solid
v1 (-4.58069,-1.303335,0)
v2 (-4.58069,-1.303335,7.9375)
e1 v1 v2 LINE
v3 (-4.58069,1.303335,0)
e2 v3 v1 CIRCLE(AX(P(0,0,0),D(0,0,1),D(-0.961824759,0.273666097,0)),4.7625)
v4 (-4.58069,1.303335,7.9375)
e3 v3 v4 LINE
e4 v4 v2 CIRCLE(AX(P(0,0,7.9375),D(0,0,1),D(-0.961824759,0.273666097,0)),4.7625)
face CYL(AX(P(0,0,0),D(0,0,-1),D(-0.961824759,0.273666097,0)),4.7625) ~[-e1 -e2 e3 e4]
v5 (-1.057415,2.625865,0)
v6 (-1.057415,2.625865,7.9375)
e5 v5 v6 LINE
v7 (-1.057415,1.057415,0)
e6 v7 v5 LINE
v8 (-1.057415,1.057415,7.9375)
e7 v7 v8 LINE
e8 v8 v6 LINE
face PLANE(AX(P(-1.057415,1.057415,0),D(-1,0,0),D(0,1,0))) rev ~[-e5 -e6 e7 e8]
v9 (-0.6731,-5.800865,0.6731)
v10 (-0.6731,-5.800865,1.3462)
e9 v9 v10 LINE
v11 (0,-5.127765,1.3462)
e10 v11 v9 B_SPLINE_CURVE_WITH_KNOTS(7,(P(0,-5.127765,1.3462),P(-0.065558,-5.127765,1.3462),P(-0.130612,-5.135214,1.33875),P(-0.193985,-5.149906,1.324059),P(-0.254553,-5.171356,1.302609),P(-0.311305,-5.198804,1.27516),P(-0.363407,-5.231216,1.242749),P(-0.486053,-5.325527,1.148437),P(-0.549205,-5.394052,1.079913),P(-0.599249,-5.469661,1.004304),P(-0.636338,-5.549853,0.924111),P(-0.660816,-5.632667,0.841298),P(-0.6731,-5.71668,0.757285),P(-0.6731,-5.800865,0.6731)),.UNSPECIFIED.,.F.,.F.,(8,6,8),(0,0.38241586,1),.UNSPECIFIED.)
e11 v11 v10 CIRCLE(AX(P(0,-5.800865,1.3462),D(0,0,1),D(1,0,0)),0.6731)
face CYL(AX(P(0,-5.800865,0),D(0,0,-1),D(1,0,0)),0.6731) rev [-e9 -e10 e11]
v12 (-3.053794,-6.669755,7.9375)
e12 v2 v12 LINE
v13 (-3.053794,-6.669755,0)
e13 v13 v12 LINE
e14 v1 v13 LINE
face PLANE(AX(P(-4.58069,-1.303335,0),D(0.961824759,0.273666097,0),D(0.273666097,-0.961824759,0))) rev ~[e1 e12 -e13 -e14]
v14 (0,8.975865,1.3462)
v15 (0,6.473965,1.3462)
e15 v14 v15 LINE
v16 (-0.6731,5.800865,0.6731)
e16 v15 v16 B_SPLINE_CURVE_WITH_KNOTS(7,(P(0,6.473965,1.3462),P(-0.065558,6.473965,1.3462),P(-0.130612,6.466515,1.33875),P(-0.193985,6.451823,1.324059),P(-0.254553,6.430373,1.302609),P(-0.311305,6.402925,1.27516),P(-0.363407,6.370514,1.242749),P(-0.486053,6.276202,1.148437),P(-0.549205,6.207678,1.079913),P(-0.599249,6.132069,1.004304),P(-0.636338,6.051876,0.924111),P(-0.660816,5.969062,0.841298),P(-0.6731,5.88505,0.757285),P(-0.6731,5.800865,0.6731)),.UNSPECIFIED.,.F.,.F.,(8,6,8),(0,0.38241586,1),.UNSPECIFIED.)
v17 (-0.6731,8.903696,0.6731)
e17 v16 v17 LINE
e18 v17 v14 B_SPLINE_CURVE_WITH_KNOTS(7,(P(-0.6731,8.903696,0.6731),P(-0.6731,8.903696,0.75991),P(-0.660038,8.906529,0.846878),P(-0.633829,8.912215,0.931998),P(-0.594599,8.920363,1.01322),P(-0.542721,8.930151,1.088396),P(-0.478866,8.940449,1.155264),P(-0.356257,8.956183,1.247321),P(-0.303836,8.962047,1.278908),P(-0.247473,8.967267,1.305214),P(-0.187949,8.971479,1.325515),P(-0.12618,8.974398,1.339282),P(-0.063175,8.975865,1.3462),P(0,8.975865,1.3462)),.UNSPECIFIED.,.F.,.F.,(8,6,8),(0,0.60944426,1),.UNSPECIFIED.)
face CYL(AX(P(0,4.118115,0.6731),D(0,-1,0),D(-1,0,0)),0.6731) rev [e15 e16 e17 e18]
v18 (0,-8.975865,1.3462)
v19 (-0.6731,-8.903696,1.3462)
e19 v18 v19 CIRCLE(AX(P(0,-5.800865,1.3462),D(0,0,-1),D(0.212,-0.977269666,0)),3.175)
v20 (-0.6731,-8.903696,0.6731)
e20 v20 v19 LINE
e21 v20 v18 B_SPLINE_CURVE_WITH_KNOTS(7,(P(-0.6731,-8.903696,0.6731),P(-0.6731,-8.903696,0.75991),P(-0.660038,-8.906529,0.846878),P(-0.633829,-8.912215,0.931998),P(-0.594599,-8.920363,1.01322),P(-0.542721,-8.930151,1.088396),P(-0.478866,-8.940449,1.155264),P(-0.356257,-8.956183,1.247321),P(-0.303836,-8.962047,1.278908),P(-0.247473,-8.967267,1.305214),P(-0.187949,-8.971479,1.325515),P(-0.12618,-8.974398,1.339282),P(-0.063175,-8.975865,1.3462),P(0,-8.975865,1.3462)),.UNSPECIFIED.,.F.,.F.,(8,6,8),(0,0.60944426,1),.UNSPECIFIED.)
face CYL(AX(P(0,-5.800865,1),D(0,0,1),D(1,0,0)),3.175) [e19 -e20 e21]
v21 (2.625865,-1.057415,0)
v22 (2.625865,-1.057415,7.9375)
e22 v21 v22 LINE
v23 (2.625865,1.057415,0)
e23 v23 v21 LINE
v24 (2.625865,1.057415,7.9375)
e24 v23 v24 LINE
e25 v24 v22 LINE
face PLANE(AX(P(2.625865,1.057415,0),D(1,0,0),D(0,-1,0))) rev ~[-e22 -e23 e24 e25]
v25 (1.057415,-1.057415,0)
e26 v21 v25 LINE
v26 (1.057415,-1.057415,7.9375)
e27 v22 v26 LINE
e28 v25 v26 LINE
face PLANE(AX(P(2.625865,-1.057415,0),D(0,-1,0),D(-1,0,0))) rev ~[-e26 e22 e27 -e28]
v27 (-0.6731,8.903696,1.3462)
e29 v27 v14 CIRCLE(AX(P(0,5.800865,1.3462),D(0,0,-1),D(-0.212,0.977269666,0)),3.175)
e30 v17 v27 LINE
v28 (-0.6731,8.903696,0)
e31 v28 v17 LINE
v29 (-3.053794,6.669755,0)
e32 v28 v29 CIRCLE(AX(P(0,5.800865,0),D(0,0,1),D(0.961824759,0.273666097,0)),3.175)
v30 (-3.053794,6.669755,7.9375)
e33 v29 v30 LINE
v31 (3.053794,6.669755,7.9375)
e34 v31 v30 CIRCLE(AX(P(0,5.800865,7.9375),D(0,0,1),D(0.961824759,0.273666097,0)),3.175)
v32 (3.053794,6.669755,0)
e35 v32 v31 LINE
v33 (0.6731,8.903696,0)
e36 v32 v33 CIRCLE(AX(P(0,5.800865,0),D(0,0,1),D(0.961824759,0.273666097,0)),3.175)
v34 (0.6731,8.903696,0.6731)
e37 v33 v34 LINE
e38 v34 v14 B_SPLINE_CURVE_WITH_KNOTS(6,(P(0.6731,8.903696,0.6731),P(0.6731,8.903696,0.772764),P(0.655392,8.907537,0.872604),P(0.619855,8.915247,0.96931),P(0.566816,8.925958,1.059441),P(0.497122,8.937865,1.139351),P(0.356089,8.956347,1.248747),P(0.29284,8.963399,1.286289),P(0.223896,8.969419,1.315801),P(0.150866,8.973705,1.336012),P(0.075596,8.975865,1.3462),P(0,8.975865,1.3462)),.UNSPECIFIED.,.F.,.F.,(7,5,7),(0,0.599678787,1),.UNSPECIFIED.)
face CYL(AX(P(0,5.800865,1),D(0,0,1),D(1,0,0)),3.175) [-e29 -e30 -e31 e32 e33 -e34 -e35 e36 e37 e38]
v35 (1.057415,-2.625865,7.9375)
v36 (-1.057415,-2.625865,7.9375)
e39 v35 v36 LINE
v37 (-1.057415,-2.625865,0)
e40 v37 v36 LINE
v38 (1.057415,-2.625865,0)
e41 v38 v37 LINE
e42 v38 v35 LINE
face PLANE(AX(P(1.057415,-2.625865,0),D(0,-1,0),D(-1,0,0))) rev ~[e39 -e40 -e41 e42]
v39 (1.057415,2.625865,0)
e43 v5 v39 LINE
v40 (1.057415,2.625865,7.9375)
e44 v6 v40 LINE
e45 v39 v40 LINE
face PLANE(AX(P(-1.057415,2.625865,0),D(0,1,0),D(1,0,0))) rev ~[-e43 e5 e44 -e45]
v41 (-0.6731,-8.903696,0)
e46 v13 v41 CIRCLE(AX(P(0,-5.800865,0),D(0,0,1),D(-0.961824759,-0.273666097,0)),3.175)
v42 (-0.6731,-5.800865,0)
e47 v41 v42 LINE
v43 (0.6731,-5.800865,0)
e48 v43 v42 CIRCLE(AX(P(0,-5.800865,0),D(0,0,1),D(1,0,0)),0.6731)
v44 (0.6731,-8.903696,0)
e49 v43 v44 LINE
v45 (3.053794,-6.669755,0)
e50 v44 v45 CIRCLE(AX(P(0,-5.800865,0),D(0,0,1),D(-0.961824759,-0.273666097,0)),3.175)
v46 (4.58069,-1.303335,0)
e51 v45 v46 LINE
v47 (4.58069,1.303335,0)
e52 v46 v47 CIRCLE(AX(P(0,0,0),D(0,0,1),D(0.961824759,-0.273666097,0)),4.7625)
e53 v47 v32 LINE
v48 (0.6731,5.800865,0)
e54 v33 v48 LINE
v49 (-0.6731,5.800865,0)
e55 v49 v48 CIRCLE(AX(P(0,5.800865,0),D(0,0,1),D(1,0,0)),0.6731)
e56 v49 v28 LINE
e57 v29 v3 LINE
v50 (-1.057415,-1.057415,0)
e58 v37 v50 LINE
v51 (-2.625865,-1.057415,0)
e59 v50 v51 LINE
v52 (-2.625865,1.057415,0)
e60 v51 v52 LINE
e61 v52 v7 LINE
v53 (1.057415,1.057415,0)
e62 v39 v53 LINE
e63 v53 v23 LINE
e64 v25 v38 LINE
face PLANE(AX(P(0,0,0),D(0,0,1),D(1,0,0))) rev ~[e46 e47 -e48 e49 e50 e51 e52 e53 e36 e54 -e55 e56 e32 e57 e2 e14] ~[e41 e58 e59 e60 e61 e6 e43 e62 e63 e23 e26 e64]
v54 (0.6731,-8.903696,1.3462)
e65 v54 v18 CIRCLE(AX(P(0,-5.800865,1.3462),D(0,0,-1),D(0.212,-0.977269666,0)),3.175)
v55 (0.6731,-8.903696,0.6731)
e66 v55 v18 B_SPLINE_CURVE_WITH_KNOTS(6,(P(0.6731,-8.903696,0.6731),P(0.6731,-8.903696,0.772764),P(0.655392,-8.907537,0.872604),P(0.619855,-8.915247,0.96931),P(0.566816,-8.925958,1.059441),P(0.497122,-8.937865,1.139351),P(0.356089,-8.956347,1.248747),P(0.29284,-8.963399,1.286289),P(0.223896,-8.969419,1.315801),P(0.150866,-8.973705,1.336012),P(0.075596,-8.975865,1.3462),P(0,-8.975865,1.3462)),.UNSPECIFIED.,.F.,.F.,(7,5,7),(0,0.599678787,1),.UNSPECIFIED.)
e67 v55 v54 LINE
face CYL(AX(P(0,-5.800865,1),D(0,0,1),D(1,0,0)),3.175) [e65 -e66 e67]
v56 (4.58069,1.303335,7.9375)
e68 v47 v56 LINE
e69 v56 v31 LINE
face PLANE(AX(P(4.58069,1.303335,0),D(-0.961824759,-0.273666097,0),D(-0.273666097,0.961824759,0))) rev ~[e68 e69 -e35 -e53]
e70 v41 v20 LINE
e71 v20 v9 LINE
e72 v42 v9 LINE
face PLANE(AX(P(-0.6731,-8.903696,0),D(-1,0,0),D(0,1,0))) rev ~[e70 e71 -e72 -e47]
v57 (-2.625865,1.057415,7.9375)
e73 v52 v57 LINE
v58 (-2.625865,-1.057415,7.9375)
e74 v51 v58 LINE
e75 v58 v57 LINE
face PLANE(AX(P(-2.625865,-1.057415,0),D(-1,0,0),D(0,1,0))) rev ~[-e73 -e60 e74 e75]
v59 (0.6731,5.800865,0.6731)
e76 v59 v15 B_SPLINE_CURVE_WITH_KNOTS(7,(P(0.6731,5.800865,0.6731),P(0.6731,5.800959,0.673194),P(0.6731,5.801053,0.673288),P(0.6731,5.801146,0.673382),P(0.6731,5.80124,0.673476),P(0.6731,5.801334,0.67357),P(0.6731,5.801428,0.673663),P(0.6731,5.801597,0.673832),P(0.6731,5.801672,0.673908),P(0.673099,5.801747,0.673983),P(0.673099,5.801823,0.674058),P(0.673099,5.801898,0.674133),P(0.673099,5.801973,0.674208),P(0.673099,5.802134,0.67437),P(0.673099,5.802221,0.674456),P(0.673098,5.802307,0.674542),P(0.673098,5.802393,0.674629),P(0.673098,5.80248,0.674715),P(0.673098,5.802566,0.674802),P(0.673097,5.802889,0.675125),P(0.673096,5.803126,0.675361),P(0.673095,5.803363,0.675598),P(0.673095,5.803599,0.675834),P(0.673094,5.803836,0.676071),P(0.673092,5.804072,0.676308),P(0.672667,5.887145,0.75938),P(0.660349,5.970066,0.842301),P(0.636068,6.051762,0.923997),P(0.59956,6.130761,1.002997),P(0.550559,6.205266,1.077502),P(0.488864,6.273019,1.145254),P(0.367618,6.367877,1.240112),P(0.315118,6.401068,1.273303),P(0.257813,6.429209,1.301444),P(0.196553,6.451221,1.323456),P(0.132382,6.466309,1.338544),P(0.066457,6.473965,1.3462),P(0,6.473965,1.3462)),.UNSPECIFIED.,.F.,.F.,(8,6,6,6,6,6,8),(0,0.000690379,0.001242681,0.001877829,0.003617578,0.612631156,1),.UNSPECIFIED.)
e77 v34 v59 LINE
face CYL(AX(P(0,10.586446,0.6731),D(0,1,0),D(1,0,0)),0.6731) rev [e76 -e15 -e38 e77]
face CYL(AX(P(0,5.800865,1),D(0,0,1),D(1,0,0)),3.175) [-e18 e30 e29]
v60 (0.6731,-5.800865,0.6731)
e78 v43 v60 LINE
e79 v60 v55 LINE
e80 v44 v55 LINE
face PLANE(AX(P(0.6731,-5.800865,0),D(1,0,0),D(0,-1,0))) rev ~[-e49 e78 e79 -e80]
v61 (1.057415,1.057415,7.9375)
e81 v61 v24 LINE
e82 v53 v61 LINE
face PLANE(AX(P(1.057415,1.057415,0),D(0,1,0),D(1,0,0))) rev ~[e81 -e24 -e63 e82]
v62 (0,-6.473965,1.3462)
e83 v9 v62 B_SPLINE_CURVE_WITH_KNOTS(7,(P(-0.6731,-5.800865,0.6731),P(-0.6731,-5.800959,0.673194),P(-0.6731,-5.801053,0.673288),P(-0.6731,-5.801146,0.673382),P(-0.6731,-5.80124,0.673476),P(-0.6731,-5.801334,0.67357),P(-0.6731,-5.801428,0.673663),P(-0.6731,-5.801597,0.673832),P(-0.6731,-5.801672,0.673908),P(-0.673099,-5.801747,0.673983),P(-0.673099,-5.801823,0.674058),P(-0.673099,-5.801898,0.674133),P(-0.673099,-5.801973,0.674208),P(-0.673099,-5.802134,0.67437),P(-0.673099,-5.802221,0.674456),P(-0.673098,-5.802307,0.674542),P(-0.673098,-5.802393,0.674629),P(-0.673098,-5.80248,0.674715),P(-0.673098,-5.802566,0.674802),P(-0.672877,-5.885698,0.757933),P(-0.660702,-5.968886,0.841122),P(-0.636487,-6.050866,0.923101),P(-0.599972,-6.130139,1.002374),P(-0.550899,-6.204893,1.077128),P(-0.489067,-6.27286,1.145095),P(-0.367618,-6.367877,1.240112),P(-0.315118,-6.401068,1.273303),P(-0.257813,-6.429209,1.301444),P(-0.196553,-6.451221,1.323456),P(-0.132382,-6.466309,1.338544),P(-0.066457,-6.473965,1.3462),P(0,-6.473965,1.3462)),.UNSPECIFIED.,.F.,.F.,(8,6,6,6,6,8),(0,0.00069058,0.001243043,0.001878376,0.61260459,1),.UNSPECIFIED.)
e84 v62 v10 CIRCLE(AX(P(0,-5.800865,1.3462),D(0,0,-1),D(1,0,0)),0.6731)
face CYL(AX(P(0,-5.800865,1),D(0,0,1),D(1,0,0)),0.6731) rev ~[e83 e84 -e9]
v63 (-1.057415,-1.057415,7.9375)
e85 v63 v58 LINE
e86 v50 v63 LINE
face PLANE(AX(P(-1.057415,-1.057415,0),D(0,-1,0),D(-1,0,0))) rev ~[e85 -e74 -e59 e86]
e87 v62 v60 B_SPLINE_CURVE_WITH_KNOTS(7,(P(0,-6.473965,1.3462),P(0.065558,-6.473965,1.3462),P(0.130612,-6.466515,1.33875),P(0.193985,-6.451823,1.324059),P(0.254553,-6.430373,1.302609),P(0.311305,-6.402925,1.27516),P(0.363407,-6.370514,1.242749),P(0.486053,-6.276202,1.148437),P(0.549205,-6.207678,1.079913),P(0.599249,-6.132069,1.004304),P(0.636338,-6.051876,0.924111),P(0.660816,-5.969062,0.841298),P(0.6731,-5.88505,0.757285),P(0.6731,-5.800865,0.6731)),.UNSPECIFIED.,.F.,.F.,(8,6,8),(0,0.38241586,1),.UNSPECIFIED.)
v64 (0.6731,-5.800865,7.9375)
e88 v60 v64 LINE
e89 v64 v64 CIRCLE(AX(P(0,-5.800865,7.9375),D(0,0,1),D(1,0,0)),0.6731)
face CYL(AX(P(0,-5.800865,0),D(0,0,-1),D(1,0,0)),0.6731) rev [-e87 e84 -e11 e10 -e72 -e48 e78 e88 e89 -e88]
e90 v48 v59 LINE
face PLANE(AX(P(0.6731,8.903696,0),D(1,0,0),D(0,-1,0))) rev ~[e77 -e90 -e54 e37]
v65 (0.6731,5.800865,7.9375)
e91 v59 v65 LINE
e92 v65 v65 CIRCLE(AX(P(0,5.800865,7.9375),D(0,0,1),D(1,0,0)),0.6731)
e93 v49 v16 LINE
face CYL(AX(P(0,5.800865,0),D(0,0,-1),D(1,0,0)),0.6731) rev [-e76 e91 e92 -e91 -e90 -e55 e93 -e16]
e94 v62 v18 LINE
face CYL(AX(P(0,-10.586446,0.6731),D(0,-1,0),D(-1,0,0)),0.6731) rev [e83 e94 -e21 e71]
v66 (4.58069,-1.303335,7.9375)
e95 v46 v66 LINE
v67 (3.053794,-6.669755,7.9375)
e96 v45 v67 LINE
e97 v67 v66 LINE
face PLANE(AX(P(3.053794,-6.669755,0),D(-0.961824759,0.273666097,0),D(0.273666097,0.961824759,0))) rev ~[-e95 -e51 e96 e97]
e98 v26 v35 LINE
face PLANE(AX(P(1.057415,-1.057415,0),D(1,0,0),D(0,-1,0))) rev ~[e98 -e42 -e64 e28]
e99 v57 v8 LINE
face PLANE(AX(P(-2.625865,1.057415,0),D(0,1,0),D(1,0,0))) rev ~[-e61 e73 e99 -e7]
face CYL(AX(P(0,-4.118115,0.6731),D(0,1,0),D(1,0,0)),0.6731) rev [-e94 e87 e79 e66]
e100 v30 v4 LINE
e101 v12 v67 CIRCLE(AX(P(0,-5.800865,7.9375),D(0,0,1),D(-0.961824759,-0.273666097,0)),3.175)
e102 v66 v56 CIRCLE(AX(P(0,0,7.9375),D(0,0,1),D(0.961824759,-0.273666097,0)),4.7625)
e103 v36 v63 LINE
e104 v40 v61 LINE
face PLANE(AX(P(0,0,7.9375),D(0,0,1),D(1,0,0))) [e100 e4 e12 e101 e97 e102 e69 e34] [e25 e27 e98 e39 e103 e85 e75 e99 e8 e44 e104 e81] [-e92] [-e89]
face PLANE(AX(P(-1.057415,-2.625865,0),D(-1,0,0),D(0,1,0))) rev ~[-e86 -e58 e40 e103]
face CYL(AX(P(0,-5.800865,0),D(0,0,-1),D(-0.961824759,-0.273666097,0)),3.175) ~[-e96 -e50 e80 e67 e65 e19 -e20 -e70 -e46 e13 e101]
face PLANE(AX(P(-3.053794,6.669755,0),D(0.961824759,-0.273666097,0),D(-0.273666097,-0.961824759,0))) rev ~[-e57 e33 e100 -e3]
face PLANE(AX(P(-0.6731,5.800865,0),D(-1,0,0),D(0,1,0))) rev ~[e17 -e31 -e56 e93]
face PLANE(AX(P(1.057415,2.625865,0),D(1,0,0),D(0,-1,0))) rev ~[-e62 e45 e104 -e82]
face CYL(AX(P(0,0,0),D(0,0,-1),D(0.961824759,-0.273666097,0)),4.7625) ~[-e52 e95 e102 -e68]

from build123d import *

# Parameters (mm, degrees)
F0_R         = 0.6731
F1_DEPTH     = 7.9375
F3_DEPTH     = 1.3462
F4_T4_DEPTH  = 6.4683311894
F4_S5_R      = 3.175
F4_T6_DEPTH  = 5
F4_S7_R      = 0.6731
F4_T8_DEPTH  = 5
F4_T12_DEPTH = 6.4683311894
F4_S13_R     = 3.175
F4_T14_DEPTH = 5
F4_S15_R     = 0.6731
F4_T16_DEPTH = 5
F4_T20_DEPTH = 6.4683311894
F4_S21_R     = 3.175
F4_T22_DEPTH = 5
F4_S23_R     = 0.6731
F4_T24_DEPTH = 5
F4_T28_DEPTH = 6.4683311894
F4_S29_R     = 3.175
F4_T30_DEPTH = 5
F4_S31_R     = 0.6731
F4_T32_DEPTH = 5


# Not quite as in the source:
# - a fillet or chamfer that OpenCascade refuses, or shapes differently, is made with other operations: its cross-section is extruded or revolved along the edge and cut away or added


with BuildPart() as f1:
    # F0 (on Top) → F1 (new body)
    with BuildSketch(Plane.XY):
        with BuildLine():
            ThreePointArc((-4.5806904159, 1.3033347856), (-4.7625, 0), (-4.5806904159, -1.3033347856))
            Line((-4.5806904159, -1.3033347856), (-3.0537936106, -6.6697545571))
            ThreePointArc((-3.0537936106, -6.6697545571), (0, -8.9758647), (3.0537936106, -6.6697545571))
            Line((3.0537936106, -6.6697545571), (4.5806904159, -1.3033347856))
            ThreePointArc((4.5806904159, -1.3033347856), (4.7625, 0), (4.5806904159, 1.3033347856))
            Line((4.5806904159, 1.3033347856), (3.0537936106, 6.6697545571))
            ThreePointArc((3.0537936106, 6.6697545571), (0, 8.9758647), (-3.0537936106, 6.6697545571))
            Line((-3.0537936106, 6.6697545571), (-4.5806904159, 1.3033347856))
        make_face()
        with Locations((0, -5.8008647)):
            Circle(F0_R, mode=Mode.SUBTRACT)
        Polygon((-1.0574147, 2.6258647), (1.0574147, 2.6258647), (1.0574147, 1.0574147), (2.6258647, 1.0574147), (2.6258647, -1.0574147), (1.0574147, -1.0574147), (1.0574147, -2.6258647), (-1.0574147, -2.6258647), (-1.0574147, -1.0574147), (-2.6258647, -1.0574147), (-2.6258647, 1.0574147), (-1.0574147, 1.0574147), align=None, mode=Mode.SUBTRACT)
        with Locations((0, 5.8008647)):
            Circle(F0_R, mode=Mode.SUBTRACT)
    extrude(amount=F1_DEPTH)

    # F2 (on face) → F3 (cut)
    with BuildSketch(Plane(origin=(0, 0, 0), x_dir=(1, 0, 0), z_dir=(0, 0, -1))):
        with BuildLine():
            Line((-0.6731, 5.8008647), (0.6731, 5.8008647))
            Line((0.6731, 5.8008647), (0.6731, 8.9036958894))
            ThreePointArc((0.6731, 8.9036958894), (0, 8.9758647), (-0.6731, 8.9036958894))
            Line((-0.6731, 8.9036958894), (-0.6731, 5.8008647))
        make_face()
        with BuildLine():
            Line((0.6731, -8.9036958894), (0.6731, -5.8008647))
            Line((0.6731, -5.8008647), (-0.6731, -5.8008647))
            Line((-0.6731, -5.8008647), (-0.6731, -8.9036958894))
            ThreePointArc((-0.6731, -8.9036958894), (0, -8.9758647), (0.6731, -8.9036958894))
        make_face()
    extrude(amount=-F3_DEPTH, mode=Mode.SUBTRACT)

    # F4: fillet of radius 0.6731 on 4 edges, made by hand


with BuildPart() as f4_tool2:
    # F4_s3 → F4_t4 (new body)
    with BuildSketch(Plane.XZ.offset(-10.5864458894)):
        with BuildLine():
            ThreePointArc((0.6731, 0.6731), (0.4759535744, 1.1490535744), (0, 1.3462))
            Line((0, 1.3462), (0.6731, 1.3462))
            Line((0.6731, 1.3462), (0.6731, 0.6731))
        make_face()
    extrude(amount=F4_T4_DEPTH)

    # F4_s5 → F4_t6 (intersect, symmetric)
    with BuildSketch(Plane.XY.offset(1)):
        with Locations((0, 5.8008647)):
            Circle(F4_S5_R)
    extrude(amount=F4_T6_DEPTH, both=True, mode=Mode.INTERSECT)

    # F4_s7 → F4_t8 (cut, symmetric)
    with BuildSketch(Plane.XY.offset(1)):
        with Locations((0, 5.8008647)):
            Circle(F4_S7_R)
    extrude(amount=F4_T8_DEPTH, both=True, mode=Mode.SUBTRACT)


with BuildPart() as f1_1:
    add(f1.part)

    # F4_t1: union F4_tool2
    add(f4_tool2.part)


with BuildPart() as f4_tool10:
    # F4_s11 → F4_t12 (new body)
    with BuildSketch(Plane.XZ.offset(-4.1181147)):
        with BuildLine():
            ThreePointArc((-0.6731, 0.6731), (-0.4759535744, 1.1490535744), (0, 1.3462))
            Line((0, 1.3462), (-0.6731, 1.3462))
            Line((-0.6731, 1.3462), (-0.6731, 0.6731))
        make_face()
    extrude(amount=-F4_T12_DEPTH)

    # F4_s13 → F4_t14 (intersect, symmetric)
    with BuildSketch(Plane.XY.offset(1)):
        with Locations((0, 5.8008647)):
            Circle(F4_S13_R)
    extrude(amount=F4_T14_DEPTH, both=True, mode=Mode.INTERSECT)

    # F4_s15 → F4_t16 (cut, symmetric)
    with BuildSketch(Plane.XY.offset(1)):
        with Locations((0, 5.8008647)):
            Circle(F4_S15_R)
    extrude(amount=F4_T16_DEPTH, both=True, mode=Mode.SUBTRACT)


with BuildPart() as f1_2:
    add(f1_1.part)

    # F4_t9: union F4_tool10
    add(f4_tool10.part)


with BuildPart() as f4_tool18:
    # F4_s19 → F4_t20 (new body)
    with BuildSketch(Plane.XZ.offset(4.1181147)):
        with BuildLine():
            ThreePointArc((0.6731, 0.6731), (0.4759535744, 1.1490535744), (0, 1.3462))
            Line((0, 1.3462), (0.6731, 1.3462))
            Line((0.6731, 1.3462), (0.6731, 0.6731))
        make_face()
    extrude(amount=F4_T20_DEPTH)

    # F4_s21 → F4_t22 (intersect, symmetric)
    with BuildSketch(Plane.XY.offset(1)):
        with Locations((0, -5.8008647)):
            Circle(F4_S21_R)
    extrude(amount=F4_T22_DEPTH, both=True, mode=Mode.INTERSECT)

    # F4_s23 → F4_t24 (cut, symmetric)
    with BuildSketch(Plane.XY.offset(1)):
        with Locations((0, -5.8008647)):
            Circle(F4_S23_R)
    extrude(amount=F4_T24_DEPTH, both=True, mode=Mode.SUBTRACT)


with BuildPart() as f1_3:
    add(f1_2.part)

    # F4_t17: union F4_tool18
    add(f4_tool18.part)


with BuildPart() as f4_tool26:
    # F4_s27 → F4_t28 (new body)
    with BuildSketch(Plane.XZ.offset(10.5864458894)):
        with BuildLine():
            ThreePointArc((-0.6731, 0.6731), (-0.4759535744, 1.1490535744), (0, 1.3462))
            Line((0, 1.3462), (-0.6731, 1.3462))
            Line((-0.6731, 1.3462), (-0.6731, 0.6731))
        make_face()
    extrude(amount=-F4_T28_DEPTH)

    # F4_s29 → F4_t30 (intersect, symmetric)
    with BuildSketch(Plane.XY.offset(1)):
        with Locations((0, -5.8008647)):
            Circle(F4_S29_R)
    extrude(amount=F4_T30_DEPTH, both=True, mode=Mode.INTERSECT)

    # F4_s31 → F4_t32 (cut, symmetric)
    with BuildSketch(Plane.XY.offset(1)):
        with Locations((0, -5.8008647)):
            Circle(F4_S31_R)
    extrude(amount=F4_T32_DEPTH, both=True, mode=Mode.SUBTRACT)


with BuildPart() as f1_4:
    add(f1_3.part)

    # F4_t25: union F4_tool26
    add(f4_tool26.part)


solid = f1_4.part
